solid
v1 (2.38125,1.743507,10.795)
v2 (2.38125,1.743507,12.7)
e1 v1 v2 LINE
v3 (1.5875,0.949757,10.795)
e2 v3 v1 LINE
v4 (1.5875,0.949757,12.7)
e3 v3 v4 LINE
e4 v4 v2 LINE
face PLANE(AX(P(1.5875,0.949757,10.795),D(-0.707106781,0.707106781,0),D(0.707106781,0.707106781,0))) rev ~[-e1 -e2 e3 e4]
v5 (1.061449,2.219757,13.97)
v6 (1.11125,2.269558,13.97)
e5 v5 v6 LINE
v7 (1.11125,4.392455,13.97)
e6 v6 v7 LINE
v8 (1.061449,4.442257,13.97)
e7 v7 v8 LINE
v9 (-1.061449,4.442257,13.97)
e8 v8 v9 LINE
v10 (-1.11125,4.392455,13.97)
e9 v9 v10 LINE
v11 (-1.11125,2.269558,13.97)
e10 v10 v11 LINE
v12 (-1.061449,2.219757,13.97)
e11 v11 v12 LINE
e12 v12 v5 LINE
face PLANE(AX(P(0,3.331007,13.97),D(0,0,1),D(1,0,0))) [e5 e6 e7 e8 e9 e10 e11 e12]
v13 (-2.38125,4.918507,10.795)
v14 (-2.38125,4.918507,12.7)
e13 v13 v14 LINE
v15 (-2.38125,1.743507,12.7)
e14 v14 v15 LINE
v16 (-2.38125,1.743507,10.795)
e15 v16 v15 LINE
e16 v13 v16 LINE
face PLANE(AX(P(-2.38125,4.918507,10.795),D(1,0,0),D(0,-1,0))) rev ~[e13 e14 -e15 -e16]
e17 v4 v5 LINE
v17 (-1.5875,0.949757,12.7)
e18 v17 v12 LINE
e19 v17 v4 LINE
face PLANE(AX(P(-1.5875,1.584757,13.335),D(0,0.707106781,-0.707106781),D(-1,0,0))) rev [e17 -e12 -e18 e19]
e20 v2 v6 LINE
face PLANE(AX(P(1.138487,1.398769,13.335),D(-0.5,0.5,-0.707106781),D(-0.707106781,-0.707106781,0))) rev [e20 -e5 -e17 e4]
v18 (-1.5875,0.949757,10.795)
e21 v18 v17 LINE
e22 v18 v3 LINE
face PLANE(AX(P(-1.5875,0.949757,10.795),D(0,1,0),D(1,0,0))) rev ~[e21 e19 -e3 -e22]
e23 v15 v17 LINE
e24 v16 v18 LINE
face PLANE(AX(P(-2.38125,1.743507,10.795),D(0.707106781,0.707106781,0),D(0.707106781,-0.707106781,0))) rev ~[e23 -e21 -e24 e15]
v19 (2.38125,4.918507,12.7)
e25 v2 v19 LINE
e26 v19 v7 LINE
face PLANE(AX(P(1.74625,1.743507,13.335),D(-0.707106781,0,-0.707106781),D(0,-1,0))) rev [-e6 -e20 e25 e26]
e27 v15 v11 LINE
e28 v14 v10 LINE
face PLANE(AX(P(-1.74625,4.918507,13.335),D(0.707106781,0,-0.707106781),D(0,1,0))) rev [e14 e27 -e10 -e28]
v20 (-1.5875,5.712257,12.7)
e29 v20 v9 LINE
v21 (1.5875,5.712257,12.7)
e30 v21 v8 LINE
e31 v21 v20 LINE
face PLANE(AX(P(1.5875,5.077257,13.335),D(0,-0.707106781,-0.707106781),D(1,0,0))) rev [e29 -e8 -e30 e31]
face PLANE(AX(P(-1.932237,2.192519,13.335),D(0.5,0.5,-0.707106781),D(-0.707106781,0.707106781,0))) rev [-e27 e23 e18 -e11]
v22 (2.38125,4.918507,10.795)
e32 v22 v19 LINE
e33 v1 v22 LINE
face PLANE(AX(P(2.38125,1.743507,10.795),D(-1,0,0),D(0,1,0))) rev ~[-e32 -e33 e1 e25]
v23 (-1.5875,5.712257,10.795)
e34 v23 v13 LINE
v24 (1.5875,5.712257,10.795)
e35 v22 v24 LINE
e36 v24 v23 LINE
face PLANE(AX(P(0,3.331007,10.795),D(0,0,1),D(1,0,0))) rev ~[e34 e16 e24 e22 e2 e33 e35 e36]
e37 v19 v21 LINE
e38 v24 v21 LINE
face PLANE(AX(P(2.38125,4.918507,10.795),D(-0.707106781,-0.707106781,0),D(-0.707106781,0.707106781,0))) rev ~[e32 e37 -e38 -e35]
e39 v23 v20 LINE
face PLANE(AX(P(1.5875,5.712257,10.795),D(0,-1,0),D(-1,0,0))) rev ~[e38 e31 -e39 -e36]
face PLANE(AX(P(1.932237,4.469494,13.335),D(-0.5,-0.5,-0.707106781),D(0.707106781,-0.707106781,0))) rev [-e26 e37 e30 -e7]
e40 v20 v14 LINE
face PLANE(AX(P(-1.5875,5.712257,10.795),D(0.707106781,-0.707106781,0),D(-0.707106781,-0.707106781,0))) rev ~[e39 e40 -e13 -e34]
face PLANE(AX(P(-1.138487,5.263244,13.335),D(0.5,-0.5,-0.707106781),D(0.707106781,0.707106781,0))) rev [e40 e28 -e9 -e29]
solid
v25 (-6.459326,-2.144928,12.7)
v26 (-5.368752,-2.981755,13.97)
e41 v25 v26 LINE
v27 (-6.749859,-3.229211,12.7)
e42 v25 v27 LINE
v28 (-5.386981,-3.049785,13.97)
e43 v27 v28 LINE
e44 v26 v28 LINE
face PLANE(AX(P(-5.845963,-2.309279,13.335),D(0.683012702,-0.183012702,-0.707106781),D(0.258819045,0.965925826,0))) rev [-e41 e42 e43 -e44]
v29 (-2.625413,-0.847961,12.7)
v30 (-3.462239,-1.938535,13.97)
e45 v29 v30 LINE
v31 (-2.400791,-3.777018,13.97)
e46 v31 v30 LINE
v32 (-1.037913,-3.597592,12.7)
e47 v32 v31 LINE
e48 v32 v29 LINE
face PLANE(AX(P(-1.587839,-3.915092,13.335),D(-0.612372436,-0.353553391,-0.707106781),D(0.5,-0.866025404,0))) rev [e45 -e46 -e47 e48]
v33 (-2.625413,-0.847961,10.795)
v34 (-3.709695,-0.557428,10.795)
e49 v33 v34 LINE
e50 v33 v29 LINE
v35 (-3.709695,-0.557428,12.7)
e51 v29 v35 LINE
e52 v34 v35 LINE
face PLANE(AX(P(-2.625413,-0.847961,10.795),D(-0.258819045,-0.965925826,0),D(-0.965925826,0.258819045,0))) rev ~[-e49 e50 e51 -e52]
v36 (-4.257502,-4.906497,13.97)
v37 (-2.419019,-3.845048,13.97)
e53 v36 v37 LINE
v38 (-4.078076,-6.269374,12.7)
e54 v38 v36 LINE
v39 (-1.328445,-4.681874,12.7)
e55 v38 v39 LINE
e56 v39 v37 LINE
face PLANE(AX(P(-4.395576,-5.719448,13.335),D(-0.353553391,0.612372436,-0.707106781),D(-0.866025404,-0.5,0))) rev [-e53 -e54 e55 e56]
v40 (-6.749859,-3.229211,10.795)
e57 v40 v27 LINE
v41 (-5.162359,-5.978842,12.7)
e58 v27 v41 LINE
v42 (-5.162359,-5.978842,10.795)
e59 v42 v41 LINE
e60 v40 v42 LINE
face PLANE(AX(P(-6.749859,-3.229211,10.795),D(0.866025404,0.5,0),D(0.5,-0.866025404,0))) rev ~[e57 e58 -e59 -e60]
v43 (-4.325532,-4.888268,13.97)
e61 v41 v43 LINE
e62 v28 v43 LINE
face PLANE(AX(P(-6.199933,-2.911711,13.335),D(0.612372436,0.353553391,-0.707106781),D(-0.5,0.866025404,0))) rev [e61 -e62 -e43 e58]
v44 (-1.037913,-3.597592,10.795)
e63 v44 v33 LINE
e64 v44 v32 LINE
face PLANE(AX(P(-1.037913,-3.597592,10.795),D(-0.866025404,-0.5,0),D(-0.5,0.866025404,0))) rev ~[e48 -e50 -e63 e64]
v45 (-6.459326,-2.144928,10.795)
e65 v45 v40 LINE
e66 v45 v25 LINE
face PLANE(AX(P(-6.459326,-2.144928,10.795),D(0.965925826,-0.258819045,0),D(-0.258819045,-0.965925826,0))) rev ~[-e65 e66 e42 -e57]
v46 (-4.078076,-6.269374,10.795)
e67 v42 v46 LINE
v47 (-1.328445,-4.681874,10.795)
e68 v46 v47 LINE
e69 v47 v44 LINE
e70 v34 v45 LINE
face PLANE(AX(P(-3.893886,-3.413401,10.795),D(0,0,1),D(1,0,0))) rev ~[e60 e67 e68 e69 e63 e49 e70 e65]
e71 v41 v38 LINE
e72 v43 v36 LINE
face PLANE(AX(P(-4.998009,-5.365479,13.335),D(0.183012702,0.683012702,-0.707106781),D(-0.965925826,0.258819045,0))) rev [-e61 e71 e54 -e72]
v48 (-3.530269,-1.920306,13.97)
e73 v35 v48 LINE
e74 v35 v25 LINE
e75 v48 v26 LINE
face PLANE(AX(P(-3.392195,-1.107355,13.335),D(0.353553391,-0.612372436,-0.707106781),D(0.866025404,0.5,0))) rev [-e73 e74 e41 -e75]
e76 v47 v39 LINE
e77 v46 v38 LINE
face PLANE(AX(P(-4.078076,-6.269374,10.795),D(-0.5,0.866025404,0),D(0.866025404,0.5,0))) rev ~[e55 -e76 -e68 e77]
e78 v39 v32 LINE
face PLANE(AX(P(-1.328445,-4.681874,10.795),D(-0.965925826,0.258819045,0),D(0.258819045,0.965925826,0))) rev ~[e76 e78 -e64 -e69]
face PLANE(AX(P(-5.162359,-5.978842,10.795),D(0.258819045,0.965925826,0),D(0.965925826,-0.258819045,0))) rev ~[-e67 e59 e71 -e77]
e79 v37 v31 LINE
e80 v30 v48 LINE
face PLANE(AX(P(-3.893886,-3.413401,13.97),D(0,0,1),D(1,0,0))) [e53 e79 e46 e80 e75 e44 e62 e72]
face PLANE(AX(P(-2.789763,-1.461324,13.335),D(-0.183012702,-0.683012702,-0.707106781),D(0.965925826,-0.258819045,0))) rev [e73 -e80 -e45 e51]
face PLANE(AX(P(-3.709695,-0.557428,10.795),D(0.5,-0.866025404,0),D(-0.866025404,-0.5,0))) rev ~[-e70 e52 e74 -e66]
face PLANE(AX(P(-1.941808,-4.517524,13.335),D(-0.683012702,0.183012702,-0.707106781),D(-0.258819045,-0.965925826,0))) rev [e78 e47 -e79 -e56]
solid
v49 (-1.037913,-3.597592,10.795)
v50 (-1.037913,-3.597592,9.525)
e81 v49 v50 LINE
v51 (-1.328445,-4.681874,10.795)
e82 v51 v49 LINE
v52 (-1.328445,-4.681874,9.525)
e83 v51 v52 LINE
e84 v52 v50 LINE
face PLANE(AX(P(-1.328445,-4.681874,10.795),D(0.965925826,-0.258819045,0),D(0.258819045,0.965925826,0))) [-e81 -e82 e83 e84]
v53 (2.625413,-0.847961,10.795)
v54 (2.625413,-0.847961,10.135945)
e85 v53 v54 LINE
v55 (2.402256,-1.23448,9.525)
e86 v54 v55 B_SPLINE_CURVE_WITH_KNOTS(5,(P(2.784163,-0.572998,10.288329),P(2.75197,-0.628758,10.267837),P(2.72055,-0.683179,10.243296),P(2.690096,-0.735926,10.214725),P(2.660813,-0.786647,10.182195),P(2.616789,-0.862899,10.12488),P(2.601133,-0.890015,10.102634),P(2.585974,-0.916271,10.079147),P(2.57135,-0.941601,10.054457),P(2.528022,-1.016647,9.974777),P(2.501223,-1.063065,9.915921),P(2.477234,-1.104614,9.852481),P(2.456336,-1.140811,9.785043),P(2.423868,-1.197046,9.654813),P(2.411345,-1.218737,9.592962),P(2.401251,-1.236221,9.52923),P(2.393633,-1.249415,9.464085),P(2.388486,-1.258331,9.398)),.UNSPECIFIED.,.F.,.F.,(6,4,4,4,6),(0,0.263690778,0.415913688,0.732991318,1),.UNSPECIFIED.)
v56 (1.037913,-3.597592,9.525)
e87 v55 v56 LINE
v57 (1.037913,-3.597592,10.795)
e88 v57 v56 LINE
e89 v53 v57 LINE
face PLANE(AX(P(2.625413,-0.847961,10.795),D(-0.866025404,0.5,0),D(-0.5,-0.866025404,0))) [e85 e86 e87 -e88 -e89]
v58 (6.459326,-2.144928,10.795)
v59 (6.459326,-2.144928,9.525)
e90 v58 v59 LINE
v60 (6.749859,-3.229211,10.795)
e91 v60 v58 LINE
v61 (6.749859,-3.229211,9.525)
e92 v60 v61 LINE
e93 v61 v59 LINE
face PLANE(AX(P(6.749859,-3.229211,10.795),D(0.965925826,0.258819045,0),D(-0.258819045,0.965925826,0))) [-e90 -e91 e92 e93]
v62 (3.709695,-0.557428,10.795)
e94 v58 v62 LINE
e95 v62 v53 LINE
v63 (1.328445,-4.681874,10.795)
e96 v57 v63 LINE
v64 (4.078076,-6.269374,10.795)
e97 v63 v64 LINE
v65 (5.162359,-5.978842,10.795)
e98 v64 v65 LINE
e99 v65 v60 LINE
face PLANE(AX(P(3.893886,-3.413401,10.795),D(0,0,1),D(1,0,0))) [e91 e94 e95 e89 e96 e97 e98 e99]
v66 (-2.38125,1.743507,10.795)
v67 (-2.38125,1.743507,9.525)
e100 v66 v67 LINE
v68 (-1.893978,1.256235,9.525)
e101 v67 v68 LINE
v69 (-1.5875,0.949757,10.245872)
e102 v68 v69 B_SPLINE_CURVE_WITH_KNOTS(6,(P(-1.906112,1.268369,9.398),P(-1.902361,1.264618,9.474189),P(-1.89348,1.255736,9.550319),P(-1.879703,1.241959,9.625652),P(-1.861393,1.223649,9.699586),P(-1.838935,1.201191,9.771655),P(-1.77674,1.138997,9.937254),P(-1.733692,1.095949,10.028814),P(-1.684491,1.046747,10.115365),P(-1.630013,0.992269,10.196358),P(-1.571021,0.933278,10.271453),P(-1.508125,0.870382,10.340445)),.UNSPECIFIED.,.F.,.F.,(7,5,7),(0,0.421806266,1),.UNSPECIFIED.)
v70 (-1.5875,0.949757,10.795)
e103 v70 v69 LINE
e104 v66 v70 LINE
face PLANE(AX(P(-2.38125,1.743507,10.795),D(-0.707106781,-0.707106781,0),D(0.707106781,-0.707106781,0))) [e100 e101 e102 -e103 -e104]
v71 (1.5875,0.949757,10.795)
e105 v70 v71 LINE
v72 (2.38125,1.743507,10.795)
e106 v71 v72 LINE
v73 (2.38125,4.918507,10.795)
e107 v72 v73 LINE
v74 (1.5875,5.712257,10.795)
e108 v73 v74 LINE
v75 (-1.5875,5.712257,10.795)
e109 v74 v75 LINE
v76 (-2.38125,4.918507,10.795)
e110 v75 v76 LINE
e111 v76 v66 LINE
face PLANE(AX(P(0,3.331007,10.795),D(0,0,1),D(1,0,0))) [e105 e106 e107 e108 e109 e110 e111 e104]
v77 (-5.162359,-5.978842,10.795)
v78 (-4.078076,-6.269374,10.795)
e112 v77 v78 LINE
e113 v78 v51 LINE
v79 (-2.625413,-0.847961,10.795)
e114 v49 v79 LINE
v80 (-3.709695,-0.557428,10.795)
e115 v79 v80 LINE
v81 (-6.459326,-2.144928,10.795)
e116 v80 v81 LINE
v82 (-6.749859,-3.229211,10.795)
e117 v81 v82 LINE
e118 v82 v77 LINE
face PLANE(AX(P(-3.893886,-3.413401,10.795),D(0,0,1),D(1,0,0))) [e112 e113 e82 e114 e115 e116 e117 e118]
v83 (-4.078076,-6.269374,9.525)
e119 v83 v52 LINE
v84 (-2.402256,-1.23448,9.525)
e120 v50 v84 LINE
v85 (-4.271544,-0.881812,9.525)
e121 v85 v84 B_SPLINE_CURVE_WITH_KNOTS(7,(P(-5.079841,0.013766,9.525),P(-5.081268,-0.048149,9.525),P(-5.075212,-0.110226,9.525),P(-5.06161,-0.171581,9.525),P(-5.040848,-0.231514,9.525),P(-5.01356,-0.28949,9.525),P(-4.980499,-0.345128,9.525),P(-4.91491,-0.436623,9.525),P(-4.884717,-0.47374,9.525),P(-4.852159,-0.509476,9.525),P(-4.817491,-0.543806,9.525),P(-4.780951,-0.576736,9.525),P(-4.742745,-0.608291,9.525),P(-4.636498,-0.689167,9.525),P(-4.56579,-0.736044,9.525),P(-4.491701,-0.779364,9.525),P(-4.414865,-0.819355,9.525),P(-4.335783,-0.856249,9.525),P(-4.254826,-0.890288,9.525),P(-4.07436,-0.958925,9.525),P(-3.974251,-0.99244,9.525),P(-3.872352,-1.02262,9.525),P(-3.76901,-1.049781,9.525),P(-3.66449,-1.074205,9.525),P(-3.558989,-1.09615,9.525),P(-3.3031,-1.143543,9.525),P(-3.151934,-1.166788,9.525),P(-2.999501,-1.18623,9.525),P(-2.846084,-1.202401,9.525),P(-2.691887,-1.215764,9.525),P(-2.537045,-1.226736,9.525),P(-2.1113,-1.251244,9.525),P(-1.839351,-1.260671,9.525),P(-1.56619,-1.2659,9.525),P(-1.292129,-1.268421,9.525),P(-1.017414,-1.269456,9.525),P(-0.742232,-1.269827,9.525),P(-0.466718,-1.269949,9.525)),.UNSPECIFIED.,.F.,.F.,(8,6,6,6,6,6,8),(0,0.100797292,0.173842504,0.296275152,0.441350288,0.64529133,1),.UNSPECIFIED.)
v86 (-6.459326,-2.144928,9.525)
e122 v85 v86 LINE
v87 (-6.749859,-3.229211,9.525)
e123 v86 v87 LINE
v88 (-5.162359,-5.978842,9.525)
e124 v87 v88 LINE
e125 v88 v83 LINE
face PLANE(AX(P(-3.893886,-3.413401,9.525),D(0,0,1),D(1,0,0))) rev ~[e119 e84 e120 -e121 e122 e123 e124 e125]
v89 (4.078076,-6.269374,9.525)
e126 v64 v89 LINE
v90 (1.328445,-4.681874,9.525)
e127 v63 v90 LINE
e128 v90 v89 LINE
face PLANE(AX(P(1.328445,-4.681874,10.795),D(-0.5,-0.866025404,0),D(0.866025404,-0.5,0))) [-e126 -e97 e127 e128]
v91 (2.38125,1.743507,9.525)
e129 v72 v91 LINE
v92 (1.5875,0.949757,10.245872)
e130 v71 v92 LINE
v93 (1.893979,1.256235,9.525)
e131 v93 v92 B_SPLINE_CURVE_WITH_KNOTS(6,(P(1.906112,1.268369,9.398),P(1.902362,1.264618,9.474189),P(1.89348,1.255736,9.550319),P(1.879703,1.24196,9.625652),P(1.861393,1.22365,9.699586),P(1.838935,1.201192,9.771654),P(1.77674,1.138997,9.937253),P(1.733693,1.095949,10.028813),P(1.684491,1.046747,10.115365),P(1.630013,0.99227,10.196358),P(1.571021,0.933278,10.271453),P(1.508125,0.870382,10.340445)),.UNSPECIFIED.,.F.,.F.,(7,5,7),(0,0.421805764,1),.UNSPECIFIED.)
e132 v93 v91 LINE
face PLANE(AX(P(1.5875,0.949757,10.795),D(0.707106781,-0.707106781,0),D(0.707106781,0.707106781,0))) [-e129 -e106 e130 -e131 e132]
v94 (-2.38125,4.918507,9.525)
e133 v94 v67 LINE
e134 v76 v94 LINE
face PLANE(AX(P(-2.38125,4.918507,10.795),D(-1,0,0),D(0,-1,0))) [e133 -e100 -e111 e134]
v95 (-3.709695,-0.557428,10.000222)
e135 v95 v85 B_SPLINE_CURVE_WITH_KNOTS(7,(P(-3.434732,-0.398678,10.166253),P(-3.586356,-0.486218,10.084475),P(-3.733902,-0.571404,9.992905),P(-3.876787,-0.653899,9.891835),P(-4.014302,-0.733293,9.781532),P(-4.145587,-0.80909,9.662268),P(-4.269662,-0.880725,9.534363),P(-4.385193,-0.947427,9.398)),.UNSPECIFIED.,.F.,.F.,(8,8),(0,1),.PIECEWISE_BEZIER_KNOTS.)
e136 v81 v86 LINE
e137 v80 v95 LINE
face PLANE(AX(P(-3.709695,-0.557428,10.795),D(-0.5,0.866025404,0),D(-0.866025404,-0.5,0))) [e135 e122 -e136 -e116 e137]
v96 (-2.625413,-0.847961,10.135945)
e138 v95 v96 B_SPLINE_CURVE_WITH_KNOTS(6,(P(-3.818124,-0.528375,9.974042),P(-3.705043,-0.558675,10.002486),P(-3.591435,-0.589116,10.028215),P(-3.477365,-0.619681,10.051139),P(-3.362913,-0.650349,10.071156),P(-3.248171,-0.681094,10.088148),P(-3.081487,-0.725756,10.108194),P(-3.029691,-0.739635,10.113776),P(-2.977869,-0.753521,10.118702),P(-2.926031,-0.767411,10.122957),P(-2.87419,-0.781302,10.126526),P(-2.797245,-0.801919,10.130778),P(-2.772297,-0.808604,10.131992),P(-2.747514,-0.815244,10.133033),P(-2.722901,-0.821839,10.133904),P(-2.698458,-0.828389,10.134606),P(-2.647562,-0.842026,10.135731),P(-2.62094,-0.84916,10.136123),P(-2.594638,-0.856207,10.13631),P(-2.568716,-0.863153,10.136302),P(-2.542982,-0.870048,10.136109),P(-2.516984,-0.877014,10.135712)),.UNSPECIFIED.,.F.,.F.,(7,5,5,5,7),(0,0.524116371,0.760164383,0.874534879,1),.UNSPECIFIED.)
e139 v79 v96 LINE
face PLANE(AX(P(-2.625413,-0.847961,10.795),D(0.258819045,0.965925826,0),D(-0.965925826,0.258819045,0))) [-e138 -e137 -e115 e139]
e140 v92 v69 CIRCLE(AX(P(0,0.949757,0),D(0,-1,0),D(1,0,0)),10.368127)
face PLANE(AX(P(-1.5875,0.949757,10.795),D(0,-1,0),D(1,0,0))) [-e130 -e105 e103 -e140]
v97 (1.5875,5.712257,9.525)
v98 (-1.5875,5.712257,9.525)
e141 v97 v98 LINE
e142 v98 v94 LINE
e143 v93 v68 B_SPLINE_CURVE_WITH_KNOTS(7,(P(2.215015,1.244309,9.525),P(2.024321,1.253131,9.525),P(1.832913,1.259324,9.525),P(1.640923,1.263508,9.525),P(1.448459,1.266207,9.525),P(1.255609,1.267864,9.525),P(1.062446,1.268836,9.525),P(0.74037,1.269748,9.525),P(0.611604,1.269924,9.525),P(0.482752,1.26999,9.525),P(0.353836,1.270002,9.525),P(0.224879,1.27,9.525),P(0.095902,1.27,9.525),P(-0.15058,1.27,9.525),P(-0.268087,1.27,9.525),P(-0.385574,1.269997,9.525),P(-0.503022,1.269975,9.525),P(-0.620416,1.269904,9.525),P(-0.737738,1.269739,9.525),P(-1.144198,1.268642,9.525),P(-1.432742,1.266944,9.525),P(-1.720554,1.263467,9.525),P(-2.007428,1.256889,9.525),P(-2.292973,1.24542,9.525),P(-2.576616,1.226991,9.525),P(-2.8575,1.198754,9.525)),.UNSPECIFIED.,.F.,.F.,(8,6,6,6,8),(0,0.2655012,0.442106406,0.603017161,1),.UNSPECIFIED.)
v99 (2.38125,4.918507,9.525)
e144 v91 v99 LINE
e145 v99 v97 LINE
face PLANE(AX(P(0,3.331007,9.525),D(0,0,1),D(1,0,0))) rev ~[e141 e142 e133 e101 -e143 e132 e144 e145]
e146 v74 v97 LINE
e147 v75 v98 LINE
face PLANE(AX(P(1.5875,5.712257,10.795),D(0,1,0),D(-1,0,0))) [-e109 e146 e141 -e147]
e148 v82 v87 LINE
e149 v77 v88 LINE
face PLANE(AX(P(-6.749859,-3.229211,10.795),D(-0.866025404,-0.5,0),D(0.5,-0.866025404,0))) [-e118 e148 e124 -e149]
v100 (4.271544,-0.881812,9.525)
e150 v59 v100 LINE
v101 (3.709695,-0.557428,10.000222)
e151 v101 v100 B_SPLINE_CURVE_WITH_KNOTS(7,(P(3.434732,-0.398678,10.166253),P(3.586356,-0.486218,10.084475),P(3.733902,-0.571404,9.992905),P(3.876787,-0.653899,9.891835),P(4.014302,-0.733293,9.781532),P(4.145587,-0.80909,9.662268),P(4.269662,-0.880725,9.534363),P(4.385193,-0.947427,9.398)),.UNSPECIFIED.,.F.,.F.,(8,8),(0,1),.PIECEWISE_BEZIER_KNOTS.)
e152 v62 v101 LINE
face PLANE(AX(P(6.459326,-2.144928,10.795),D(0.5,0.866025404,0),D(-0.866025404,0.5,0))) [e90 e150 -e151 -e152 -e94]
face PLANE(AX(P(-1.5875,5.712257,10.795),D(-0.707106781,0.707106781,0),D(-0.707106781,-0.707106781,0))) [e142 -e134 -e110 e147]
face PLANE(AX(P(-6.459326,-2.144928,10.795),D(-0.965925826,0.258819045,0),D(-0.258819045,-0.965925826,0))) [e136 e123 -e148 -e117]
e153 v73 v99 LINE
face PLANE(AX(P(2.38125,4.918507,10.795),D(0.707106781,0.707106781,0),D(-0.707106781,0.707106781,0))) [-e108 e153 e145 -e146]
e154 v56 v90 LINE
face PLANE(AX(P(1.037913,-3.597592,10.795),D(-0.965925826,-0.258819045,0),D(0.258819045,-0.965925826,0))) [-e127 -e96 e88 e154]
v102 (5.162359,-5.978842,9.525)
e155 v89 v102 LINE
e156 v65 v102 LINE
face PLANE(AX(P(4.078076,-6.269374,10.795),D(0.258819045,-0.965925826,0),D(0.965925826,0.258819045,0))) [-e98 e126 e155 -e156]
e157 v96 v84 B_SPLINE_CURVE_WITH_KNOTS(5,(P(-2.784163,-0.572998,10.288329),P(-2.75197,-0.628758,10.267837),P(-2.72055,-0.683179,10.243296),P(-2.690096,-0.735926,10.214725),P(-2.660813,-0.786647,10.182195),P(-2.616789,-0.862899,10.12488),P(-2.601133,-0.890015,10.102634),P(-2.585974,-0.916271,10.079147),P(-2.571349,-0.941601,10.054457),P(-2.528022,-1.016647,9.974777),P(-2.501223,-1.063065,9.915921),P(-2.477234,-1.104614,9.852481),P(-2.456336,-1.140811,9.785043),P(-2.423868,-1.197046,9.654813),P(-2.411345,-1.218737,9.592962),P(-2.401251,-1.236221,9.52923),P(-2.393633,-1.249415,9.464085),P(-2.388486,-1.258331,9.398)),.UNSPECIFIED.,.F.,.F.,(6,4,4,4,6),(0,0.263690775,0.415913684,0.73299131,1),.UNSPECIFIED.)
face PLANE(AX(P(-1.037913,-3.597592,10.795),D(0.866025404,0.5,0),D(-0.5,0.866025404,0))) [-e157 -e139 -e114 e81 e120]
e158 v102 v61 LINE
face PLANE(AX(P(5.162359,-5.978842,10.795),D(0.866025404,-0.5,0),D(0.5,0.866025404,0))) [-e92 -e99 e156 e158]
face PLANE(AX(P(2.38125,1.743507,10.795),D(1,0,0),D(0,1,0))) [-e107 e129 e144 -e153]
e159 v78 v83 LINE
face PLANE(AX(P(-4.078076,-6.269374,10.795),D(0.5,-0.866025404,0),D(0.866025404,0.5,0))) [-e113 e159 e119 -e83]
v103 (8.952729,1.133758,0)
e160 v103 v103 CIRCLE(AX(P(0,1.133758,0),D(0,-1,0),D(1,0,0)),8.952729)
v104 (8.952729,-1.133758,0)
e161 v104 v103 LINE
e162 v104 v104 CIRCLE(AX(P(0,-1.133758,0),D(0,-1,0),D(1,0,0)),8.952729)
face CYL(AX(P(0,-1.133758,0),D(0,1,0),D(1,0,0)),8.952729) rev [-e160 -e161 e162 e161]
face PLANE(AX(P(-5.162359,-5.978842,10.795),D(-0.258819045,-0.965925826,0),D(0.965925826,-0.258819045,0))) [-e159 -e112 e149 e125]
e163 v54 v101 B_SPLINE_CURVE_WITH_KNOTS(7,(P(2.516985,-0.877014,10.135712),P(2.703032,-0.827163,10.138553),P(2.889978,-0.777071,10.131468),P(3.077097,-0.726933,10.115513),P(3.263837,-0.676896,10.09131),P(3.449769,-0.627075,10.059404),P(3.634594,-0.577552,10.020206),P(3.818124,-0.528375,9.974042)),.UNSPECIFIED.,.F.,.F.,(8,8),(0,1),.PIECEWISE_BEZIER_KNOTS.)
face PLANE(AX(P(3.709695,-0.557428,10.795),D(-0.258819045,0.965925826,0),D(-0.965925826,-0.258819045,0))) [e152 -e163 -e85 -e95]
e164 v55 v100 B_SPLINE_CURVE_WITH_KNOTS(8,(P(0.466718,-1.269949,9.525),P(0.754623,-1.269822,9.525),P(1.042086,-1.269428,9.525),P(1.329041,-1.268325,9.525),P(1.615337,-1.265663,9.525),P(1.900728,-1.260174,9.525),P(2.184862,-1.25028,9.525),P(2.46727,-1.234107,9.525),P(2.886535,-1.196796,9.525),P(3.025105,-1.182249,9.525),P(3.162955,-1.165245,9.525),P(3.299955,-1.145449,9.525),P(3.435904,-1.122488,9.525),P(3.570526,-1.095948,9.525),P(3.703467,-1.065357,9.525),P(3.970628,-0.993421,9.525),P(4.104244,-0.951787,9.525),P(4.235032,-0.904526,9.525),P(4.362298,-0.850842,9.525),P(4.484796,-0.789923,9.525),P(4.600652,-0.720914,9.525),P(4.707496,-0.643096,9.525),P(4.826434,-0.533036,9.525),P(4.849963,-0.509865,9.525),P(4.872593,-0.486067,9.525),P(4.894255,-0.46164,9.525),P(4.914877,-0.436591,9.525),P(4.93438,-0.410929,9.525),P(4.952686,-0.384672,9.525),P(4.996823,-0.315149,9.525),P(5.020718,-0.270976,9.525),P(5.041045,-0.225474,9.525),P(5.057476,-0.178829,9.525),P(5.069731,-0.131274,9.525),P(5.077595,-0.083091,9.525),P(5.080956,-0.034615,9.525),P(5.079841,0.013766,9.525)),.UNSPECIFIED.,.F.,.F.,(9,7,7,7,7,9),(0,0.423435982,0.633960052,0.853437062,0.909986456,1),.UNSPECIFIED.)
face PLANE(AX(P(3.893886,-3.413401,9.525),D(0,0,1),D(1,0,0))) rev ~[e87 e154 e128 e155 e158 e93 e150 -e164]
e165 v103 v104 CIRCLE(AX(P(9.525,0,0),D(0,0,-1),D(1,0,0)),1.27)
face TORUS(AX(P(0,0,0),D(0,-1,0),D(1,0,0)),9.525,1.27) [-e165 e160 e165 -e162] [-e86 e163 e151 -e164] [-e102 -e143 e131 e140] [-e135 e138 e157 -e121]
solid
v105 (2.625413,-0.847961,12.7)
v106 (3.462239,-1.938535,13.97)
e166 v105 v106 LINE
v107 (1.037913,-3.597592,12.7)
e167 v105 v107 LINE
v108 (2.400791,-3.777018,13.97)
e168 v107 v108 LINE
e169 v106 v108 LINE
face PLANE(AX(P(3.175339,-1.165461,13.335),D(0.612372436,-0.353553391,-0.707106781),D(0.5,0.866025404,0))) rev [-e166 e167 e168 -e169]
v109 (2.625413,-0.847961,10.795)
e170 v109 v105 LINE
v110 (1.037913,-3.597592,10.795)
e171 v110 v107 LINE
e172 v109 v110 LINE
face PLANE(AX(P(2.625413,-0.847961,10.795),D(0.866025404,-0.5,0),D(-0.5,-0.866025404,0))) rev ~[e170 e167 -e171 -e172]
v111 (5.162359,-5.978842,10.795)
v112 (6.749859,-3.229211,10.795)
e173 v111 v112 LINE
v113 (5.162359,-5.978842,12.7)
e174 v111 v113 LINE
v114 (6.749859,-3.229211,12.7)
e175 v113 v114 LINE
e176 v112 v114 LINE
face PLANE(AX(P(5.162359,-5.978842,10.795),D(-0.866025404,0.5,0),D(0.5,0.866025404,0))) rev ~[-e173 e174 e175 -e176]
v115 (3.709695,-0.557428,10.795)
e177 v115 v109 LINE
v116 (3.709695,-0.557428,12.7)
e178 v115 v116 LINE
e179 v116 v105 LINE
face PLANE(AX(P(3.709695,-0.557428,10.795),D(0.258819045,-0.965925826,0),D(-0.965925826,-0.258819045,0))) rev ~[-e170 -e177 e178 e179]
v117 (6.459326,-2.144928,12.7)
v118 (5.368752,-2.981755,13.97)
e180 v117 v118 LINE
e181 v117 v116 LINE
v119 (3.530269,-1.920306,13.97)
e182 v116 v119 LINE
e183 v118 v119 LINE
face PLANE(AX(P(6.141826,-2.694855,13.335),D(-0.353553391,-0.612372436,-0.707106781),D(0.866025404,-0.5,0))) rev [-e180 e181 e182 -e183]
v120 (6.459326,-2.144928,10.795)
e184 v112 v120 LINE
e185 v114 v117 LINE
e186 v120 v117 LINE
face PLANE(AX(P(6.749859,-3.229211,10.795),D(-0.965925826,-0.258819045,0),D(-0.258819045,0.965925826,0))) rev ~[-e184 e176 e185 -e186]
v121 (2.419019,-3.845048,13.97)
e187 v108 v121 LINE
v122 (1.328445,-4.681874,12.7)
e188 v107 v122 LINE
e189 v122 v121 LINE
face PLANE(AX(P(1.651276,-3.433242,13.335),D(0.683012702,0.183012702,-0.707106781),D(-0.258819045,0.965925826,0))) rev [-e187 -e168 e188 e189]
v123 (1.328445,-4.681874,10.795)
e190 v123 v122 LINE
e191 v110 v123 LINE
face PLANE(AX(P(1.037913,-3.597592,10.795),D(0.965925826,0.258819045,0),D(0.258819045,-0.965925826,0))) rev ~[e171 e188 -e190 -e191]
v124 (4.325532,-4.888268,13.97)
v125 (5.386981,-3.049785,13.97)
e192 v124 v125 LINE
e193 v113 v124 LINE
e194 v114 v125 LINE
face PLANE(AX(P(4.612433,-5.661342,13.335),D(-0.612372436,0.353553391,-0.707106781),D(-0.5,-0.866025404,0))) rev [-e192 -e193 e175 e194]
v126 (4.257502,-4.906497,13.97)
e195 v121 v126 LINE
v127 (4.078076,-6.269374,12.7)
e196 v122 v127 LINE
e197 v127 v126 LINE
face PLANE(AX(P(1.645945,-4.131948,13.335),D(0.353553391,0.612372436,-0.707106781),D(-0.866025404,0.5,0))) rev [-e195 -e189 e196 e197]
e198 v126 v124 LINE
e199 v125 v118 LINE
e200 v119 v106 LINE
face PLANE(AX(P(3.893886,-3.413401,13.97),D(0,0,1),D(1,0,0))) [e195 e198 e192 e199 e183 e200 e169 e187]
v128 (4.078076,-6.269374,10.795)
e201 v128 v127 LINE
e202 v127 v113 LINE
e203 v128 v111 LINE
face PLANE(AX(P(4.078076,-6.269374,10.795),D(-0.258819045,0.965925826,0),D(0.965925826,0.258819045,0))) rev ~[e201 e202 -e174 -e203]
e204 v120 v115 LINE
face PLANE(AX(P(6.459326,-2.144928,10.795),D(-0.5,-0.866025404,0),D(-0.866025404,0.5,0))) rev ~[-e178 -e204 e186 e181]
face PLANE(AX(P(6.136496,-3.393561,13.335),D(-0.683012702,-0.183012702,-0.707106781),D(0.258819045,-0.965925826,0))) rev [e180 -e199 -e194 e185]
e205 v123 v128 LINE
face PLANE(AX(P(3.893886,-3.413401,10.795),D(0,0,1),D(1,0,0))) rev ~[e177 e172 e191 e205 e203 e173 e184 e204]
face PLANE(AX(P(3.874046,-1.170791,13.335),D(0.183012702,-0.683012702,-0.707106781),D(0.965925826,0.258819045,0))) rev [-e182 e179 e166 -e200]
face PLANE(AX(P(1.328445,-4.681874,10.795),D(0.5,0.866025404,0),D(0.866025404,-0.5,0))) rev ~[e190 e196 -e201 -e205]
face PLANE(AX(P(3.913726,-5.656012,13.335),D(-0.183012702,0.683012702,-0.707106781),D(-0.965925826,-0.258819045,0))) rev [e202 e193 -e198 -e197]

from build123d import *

# Parameters (mm, degrees)
F5_DEPTH  = 3.175
F6_SIZE   = 1.27
F6_2_SIZE = 1.27
F6_3_SIZE = 1.27
F7_DEPTH  = 1.27


with BuildPart() as f2:
    # F2: sweep along a path in F0
    with BuildLine(Plane.XZ) as f2_path:
        CenterArc((0, 0), 9.525, 0, 360)
    # F1 (on Top) → F2 (sweep)
    with BuildSketch(Plane.XY):
        with BuildLine():
            Line((-8.9527293057, 0), (-8.9527293057, 1.133757581))
            ThreePointArc((-8.9527293057, 1.133757581), (-10.795, 0), (-8.9527293057, -1.133757581))
            Line((-8.9527293057, -1.133757581), (-8.9527293057, 0))
        make_face()
    sweep(path=f2_path.line)

    # F4 (on offset) → F7 (join)
    with BuildSketch(Plane.XY.offset(10.795)):
        Polygon((2.625412817, -0.8479611432), (1.831662817, -2.2227764717), (1.037912817, -3.5975918002), (1.3284454812, -4.6818744645), (2.7032608097, -5.4756244645), (4.0780761382, -6.2693744645), (5.1623588025, -5.9788418002), (5.9561088025, -4.6040264717), (6.7498588025, -3.2292111432), (6.4593261382, -2.144928479), (5.0845108097, -1.351178479), (3.7096954812, -0.557428479), align=None)
        Polygon((-1.0379127641, -3.5975918002), (-1.8316627641, -2.2227764717), (-2.6254127641, -0.8479611432), (-3.7096954284, -0.557428479), (-5.0845107569, -1.351178479), (-6.4593260854, -2.144928479), (-6.7498587497, -3.2292111432), (-5.9561087497, -4.6040264717), (-5.1623587497, -5.9788418002), (-4.0780760854, -6.2693744645), (-2.7032607569, -5.4756244645), (-1.3284454284, -4.6818744645), align=None)
        Polygon((-1.5874999736, 0.9497565438), (2.64e-08, 0.9497565438), (1.5875000264, 0.9497565438), (2.3812500264, 1.7435065438), (2.3812500264, 3.3310065438), (2.3812500264, 4.9185065438), (1.5875000264, 5.7122565438), (2.64e-08, 5.7122565438), (-1.5874999736, 5.7122565438), (-2.3812499736, 4.9185065438), (-2.3812499736, 3.3310065438), (-2.3812499736, 1.7435065438), align=None)
    extrude(amount=-F7_DEPTH)


with BuildPart() as f5:
    # F4 (on offset) → F5 (new body)
    with BuildSketch(Plane.XY.offset(10.795)):
        Polygon((-1.5874999736, 0.9497565438), (2.64e-08, 0.9497565438), (1.5875000264, 0.9497565438), (2.3812500264, 1.7435065438), (2.3812500264, 3.3310065438), (2.3812500264, 4.9185065438), (1.5875000264, 5.7122565438), (2.64e-08, 5.7122565438), (-1.5874999736, 5.7122565438), (-2.3812499736, 4.9185065438), (-2.3812499736, 3.3310065438), (-2.3812499736, 1.7435065438), align=None)
    extrude(amount=F5_DEPTH)

    # F6
    f6_edges = [f5.edges().sort_by_distance(p)[0] for p in [
        (-1.984375, 1.346632, 13.97),
        (0, 0.949757, 13.97),
        (1.984375, 1.346632, 13.97),
        (2.38125, 3.331007, 13.97),
        (1.984375, 5.315382, 13.97),
        (0, 5.712257, 13.97),
        (-1.984375, 5.315382, 13.97),
        (-2.38125, 3.331007, 13.97),
    ]]
    chamfer(f6_edges, length=F6_SIZE)


with BuildPart() as f5b:
    # F4 (on offset) → F5, piece 2 (new body)
    with BuildSketch(Plane.XY.offset(10.795)):
        Polygon((-1.0379127641, -3.5975918002), (-1.8316627641, -2.2227764717), (-2.6254127641, -0.8479611432), (-3.7096954284, -0.557428479), (-5.0845107569, -1.351178479), (-6.4593260854, -2.144928479), (-6.7498587497, -3.2292111432), (-5.9561087497, -4.6040264717), (-5.1623587497, -5.9788418002), (-4.0780760854, -6.2693744645), (-2.7032607569, -5.4756244645), (-1.3284454284, -4.6818744645), align=None)
    extrude(amount=F5_DEPTH)

    # F6#2
    f6_2_edges = [f5b.edges().sort_by_distance(p)[0] for p in [
        (-1.831663, -2.222776, 13.97),
        (-3.167554, -0.702695, 13.97),
        (-5.084511, -1.351178, 13.97),
        (-6.604592, -2.68707, 13.97),
        (-5.956109, -4.604026, 13.97),
        (-4.620217, -6.124108, 13.97),
        (-2.703261, -5.475624, 13.97),
        (-1.183179, -4.139733, 13.97),
    ]]
    chamfer(f6_2_edges, length=F6_2_SIZE)


with BuildPart() as f5c:
    # F4 (on offset) → F5, piece 3 (new body)
    with BuildSketch(Plane.XY.offset(10.795)):
        Polygon((2.625412817, -0.8479611432), (1.831662817, -2.2227764717), (1.037912817, -3.5975918002), (1.3284454812, -4.6818744645), (2.7032608097, -5.4756244645), (4.0780761382, -6.2693744645), (5.1623588025, -5.9788418002), (5.9561088025, -4.6040264717), (6.7498588025, -3.2292111432), (6.4593261382, -2.144928479), (5.0845108097, -1.351178479), (3.7096954812, -0.557428479), align=None)
    extrude(amount=F5_DEPTH)

    # F6#3
    f6_3_edges = [f5c.edges().sort_by_distance(p)[0] for p in [
        (5.084511, -1.351178, 13.97),
        (3.167554, -0.702695, 13.97),
        (1.831663, -2.222776, 13.97),
        (1.183179, -4.139733, 13.97),
        (2.703261, -5.475624, 13.97),
        (4.620217, -6.124108, 13.97),
        (5.956109, -4.604026, 13.97),
        (6.604592, -2.68707, 13.97),
    ]]
    chamfer(f6_3_edges, length=F6_3_SIZE)


solid = Compound([f2.part, f5.part, f5b.part, f5c.part])
